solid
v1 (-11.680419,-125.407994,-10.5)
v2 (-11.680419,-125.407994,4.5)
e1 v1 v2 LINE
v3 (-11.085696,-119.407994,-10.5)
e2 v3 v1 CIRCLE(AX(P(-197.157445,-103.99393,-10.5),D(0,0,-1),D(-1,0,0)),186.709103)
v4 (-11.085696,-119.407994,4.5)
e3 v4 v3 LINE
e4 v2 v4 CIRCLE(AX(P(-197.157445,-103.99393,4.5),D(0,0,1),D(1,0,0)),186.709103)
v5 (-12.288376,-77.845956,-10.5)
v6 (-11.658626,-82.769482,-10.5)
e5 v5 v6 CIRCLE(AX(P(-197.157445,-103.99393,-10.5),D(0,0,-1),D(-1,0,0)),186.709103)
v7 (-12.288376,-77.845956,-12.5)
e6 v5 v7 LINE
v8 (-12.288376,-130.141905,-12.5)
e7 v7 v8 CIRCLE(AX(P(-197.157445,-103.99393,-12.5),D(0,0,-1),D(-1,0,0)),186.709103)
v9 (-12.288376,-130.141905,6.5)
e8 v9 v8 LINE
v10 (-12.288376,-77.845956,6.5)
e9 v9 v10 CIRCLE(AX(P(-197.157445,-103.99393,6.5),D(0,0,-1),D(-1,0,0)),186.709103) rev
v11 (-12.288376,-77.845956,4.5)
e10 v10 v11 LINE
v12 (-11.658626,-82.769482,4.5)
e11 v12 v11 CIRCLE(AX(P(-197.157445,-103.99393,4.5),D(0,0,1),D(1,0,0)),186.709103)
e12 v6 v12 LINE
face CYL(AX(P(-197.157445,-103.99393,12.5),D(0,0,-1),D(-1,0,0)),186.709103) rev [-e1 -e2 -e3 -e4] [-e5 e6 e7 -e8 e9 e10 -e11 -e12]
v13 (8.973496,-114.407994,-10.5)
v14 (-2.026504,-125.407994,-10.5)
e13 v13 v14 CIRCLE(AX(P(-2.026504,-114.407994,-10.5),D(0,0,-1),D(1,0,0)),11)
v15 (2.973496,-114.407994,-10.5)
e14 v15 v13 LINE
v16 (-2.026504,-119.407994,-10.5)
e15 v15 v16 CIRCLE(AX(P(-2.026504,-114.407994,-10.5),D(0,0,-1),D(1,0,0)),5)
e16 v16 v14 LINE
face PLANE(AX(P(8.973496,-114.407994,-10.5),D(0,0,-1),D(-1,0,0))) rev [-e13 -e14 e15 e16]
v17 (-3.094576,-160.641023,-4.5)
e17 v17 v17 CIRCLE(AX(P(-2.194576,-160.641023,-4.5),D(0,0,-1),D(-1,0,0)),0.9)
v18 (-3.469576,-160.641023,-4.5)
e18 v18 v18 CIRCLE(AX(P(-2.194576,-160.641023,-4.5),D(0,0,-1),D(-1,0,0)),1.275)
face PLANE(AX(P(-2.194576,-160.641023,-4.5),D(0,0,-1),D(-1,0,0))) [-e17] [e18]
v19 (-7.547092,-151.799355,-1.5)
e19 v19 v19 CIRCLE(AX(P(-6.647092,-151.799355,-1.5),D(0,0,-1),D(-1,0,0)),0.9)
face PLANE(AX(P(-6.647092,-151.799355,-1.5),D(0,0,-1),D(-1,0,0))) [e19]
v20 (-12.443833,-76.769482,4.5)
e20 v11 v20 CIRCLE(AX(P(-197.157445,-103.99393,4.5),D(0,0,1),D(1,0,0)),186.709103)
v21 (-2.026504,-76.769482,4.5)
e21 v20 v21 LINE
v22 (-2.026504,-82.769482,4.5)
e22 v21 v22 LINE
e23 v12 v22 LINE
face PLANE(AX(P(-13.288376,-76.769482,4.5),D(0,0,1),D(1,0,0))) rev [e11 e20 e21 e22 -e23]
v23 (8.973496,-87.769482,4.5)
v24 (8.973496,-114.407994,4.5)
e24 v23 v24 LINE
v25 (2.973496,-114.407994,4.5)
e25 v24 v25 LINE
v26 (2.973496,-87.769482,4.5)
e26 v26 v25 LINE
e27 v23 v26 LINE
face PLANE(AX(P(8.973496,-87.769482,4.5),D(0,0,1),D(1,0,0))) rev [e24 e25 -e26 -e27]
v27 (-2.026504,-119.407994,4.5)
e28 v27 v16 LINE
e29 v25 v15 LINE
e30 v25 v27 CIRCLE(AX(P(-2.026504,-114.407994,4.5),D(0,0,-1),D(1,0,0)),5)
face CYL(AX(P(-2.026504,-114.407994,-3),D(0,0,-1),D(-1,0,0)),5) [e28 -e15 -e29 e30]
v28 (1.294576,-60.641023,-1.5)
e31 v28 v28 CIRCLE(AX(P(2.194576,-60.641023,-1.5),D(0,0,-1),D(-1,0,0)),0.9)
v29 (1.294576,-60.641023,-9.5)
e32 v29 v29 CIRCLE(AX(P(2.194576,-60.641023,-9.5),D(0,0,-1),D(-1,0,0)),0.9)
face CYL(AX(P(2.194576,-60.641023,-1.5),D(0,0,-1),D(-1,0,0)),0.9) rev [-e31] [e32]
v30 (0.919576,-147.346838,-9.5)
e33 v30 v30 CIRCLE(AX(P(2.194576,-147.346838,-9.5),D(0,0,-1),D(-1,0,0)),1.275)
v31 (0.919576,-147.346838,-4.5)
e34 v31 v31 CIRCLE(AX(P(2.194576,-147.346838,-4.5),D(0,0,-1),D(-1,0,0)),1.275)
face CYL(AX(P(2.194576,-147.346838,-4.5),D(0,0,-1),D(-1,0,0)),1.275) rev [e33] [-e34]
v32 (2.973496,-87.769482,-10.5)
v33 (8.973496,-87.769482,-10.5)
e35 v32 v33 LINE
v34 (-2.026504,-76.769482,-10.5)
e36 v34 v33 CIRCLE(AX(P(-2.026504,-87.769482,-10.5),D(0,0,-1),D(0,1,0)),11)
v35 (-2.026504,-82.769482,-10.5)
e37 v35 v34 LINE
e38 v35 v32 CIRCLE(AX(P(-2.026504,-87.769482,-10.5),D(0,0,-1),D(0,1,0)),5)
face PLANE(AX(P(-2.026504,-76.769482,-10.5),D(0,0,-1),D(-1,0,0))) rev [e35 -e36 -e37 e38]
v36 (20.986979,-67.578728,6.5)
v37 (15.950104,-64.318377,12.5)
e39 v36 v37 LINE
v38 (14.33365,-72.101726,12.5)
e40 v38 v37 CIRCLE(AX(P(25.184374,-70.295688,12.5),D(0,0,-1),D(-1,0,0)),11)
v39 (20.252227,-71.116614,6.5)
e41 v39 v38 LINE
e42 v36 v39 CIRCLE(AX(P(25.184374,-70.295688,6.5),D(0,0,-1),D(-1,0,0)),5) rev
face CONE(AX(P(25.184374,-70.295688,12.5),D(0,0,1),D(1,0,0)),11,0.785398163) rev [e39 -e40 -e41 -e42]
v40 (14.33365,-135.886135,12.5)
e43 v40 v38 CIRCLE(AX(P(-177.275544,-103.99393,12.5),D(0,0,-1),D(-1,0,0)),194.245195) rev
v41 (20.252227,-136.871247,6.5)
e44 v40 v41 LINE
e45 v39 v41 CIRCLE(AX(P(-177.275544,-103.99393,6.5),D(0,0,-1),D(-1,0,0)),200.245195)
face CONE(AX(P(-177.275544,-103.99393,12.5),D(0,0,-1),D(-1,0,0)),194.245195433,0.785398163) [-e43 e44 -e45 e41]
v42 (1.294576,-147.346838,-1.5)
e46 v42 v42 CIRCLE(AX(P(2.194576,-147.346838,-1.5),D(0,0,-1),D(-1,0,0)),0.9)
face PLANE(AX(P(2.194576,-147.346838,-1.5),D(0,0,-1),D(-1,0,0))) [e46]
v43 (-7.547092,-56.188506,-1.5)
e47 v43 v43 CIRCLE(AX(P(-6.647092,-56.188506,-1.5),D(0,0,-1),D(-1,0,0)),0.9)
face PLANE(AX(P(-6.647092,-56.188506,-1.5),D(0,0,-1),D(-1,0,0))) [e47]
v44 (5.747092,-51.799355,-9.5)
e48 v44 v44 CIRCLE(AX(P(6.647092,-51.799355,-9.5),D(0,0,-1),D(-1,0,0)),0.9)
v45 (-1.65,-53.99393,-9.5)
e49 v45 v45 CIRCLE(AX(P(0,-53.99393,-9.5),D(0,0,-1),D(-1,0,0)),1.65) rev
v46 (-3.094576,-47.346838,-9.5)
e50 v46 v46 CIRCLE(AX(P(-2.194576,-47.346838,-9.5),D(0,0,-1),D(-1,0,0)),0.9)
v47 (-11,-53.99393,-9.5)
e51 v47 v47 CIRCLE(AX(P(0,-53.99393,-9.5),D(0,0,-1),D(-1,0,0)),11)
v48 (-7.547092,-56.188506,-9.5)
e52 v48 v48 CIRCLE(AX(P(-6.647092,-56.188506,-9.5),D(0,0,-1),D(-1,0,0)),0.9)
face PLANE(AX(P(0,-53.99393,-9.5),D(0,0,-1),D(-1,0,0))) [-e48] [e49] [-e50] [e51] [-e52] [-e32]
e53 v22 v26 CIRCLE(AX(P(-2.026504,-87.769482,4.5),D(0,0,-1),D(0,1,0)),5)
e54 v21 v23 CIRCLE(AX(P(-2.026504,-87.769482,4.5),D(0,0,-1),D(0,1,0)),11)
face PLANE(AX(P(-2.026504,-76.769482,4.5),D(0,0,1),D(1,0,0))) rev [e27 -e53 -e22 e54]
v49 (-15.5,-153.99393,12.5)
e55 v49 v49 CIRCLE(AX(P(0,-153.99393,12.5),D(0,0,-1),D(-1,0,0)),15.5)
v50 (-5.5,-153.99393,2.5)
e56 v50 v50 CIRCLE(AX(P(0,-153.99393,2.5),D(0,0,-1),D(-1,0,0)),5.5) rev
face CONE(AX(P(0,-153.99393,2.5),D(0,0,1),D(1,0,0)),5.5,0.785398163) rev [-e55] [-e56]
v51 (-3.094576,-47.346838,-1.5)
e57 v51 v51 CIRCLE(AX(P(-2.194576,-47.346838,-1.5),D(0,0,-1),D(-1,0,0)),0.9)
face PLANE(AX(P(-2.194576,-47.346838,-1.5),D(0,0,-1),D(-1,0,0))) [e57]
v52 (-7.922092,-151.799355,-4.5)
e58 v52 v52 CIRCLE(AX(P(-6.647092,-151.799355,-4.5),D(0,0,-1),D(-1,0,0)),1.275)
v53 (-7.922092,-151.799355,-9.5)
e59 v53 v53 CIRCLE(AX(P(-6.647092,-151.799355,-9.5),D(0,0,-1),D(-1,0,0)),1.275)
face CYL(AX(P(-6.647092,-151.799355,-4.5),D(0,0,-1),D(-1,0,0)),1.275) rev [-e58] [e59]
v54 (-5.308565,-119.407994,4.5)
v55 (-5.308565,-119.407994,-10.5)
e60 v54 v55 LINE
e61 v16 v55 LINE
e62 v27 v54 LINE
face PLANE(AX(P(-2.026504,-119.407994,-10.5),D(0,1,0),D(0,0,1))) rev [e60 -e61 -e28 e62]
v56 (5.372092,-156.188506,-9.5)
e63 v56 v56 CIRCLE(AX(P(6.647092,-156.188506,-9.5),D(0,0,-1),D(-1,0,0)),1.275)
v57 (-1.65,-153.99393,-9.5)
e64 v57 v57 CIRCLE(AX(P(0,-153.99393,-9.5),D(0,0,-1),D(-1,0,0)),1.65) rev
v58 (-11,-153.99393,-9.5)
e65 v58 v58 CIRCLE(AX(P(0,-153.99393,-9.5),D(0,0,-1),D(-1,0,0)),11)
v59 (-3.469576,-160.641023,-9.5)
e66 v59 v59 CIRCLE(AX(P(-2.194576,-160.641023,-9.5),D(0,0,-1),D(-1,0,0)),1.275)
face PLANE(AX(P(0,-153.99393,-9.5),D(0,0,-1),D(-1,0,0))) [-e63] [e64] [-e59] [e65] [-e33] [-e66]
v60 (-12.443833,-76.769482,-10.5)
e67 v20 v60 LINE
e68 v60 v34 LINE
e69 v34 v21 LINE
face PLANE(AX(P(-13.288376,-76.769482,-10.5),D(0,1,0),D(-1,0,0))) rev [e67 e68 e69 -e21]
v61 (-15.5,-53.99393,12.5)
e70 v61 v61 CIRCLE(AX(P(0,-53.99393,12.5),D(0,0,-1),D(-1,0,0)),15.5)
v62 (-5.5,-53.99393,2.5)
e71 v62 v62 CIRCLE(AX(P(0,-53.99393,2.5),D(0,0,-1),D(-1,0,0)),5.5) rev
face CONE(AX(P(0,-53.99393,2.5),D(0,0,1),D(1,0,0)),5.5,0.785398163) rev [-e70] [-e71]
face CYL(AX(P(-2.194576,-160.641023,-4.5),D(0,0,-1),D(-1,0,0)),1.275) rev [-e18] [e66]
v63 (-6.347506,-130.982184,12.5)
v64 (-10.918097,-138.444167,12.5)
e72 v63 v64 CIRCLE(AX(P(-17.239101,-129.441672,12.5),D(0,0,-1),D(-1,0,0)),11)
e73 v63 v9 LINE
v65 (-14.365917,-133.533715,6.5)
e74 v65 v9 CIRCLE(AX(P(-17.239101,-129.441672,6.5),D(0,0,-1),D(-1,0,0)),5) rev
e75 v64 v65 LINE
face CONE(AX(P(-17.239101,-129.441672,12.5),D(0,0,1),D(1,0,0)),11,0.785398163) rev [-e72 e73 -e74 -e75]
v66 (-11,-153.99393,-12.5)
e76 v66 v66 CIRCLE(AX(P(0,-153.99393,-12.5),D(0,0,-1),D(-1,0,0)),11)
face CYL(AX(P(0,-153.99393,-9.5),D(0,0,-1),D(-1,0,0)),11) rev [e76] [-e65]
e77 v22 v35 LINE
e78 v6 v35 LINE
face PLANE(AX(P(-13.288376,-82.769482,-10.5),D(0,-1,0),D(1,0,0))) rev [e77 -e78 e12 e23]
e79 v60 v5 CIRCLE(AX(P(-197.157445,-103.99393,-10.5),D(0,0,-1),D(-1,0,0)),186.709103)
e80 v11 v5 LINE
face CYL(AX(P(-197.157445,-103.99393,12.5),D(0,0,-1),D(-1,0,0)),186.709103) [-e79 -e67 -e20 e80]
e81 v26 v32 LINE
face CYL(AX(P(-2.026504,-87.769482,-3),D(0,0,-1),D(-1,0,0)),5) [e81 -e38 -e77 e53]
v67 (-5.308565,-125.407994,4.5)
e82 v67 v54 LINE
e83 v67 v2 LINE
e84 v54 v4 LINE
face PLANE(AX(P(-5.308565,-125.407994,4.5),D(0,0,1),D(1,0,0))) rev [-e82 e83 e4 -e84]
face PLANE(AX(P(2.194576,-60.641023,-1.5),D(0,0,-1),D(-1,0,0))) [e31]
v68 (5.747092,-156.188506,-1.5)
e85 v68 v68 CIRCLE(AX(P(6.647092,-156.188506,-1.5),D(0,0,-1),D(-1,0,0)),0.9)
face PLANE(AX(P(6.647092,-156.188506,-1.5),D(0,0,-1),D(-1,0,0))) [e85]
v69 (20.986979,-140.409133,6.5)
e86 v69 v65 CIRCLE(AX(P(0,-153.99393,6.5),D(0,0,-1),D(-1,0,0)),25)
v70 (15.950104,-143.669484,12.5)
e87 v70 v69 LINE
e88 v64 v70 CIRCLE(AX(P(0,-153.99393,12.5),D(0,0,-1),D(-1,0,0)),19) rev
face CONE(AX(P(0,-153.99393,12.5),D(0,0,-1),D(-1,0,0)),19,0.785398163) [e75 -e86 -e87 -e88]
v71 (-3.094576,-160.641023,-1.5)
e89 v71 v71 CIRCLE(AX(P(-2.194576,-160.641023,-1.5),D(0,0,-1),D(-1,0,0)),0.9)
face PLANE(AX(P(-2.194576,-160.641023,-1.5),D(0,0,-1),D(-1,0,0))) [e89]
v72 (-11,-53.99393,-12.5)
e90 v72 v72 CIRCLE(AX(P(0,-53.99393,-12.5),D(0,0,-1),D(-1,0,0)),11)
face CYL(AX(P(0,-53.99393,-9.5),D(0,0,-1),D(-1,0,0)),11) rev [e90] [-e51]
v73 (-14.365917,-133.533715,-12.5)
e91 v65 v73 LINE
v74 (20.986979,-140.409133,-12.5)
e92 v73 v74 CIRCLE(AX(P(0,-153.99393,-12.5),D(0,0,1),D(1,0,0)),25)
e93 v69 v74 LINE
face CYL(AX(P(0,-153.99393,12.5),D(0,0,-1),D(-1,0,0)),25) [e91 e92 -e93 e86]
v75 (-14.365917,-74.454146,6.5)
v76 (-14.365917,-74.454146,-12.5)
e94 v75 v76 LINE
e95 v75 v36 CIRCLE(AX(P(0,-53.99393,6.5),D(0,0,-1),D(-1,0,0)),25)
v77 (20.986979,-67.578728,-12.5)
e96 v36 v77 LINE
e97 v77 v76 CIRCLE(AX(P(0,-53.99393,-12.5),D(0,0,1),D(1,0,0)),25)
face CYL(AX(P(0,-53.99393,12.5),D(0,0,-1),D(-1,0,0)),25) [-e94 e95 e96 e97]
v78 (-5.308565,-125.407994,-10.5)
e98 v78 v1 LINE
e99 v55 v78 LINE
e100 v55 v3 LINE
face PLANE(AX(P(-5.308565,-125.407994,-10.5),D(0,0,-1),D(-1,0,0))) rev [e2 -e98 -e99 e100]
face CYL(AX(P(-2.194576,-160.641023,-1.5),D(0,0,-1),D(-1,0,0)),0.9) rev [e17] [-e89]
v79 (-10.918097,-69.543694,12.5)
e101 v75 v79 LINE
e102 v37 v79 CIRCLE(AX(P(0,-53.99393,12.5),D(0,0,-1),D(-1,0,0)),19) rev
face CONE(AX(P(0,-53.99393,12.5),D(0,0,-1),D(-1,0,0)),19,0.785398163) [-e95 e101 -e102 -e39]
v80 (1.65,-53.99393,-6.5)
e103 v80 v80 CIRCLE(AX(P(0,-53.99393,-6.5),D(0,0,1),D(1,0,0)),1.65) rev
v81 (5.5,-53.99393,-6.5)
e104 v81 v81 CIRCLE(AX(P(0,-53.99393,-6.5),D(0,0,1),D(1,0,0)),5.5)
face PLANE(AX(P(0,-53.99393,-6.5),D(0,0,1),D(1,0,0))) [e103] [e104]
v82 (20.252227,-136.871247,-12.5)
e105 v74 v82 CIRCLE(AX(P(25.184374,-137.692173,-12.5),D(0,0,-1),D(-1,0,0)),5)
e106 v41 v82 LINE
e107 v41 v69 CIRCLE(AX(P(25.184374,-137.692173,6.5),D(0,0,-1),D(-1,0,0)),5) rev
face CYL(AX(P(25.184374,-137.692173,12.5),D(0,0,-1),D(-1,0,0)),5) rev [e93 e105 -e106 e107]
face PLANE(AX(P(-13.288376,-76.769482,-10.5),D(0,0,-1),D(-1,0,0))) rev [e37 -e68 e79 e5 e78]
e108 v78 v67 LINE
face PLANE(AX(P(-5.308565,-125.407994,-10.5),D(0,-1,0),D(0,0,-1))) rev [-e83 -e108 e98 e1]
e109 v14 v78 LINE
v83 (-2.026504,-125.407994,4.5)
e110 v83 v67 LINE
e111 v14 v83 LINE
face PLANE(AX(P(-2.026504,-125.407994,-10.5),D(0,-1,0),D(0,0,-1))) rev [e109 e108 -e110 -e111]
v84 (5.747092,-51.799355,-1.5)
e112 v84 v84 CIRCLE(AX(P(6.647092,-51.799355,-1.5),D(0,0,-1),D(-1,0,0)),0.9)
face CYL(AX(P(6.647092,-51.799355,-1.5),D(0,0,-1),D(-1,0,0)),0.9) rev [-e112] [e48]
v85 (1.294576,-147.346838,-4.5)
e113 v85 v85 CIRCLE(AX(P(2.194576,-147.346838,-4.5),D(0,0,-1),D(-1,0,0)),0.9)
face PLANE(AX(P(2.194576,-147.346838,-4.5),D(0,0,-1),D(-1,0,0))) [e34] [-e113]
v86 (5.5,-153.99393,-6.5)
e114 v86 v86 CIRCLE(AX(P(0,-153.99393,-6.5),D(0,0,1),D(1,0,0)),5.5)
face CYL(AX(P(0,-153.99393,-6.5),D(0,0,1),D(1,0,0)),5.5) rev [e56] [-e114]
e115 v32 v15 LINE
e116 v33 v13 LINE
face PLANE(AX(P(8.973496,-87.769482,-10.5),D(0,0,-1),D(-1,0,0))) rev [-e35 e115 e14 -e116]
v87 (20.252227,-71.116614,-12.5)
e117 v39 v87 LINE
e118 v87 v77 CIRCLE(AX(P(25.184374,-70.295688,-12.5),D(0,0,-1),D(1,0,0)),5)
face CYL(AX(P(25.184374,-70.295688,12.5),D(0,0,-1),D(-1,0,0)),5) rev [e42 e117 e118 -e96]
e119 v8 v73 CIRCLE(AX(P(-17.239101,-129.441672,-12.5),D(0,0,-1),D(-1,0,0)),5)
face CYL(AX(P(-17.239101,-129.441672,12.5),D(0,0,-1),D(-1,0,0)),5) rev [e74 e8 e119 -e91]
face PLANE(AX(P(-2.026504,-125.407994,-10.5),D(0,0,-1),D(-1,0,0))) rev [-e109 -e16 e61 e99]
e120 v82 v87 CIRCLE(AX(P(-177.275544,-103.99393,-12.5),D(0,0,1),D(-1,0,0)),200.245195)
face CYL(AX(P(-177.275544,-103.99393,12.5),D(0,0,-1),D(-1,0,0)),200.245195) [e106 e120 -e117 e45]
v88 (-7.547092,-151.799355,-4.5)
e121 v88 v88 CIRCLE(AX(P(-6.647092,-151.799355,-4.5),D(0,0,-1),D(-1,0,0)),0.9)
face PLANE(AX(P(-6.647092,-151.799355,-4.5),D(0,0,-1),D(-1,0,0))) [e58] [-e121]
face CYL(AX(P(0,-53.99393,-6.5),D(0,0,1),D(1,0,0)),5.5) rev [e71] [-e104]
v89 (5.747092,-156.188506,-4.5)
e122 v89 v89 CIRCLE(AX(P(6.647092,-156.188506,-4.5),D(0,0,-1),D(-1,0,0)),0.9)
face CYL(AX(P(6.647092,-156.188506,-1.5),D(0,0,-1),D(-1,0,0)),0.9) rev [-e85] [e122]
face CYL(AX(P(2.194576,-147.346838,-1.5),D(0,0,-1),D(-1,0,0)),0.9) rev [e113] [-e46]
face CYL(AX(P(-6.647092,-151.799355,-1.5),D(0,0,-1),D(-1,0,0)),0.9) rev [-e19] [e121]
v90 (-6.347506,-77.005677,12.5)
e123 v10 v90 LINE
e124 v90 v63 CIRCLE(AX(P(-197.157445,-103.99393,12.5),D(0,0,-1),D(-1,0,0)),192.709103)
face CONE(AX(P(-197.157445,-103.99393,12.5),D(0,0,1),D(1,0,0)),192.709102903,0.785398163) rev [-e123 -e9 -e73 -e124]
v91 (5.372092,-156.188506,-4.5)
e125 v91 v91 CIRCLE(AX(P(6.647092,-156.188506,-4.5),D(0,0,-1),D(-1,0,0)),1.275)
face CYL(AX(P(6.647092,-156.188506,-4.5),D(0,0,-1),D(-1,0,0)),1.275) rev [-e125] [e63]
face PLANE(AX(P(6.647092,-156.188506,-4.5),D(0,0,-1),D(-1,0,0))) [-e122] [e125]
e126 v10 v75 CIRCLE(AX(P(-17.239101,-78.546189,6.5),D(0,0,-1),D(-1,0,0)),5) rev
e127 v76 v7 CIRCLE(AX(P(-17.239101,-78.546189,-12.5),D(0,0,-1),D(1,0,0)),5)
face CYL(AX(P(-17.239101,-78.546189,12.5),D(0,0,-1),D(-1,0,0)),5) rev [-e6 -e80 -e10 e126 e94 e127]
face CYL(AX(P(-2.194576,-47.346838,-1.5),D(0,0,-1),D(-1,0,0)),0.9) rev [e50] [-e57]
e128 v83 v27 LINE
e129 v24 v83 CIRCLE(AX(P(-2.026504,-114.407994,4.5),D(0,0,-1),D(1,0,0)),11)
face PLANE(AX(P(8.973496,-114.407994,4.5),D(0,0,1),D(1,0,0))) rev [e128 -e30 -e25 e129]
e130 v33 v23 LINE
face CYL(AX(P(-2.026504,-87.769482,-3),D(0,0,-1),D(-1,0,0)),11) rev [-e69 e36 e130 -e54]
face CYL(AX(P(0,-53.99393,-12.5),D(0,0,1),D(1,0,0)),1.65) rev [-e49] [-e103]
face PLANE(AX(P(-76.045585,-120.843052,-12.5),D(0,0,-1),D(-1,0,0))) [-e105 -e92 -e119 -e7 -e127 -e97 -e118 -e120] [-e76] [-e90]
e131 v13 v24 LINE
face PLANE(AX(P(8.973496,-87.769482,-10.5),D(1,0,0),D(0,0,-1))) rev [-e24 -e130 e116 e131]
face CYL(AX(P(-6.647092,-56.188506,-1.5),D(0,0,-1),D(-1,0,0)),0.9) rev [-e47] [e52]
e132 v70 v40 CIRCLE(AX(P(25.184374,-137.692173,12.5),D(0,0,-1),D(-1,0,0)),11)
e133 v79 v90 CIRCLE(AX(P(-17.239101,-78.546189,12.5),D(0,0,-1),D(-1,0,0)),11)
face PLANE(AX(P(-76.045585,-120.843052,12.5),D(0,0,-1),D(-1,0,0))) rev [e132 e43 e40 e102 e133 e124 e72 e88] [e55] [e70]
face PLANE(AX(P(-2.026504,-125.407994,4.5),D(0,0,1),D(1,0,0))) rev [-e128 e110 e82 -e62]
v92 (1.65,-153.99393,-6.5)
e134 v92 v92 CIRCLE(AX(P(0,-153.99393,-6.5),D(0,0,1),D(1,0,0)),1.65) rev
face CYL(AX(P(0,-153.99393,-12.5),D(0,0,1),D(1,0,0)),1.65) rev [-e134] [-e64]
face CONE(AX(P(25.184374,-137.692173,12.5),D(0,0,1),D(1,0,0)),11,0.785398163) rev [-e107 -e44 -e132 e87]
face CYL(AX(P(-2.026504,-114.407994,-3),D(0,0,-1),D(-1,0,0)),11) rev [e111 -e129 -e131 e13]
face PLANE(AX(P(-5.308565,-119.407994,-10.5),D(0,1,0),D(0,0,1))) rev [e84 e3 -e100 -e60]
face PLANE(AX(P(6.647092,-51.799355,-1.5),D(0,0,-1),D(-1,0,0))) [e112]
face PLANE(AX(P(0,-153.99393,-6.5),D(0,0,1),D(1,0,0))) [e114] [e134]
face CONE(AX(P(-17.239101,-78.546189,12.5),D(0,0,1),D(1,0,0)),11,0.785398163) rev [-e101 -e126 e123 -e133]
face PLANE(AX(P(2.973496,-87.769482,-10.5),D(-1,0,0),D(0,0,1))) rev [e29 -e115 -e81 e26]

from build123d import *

# Parameters (mm, degrees)
BOSS_EXTRUDE2_DEPTH = 12.5
SKETCH2_R           = 1.65
CUT_EXTRUDE1_DEPTH  = 183.452259897
SKETCH4_R           = 11
CUT_EXTRUDE3_DEPTH  = 3
CHAMFER1_SIZE       = 6
SKETCH32_R          = 1.275
CUT_EXTRUDE6_DEPTH  = 8
SKETCH34_R          = 0.9
CUT_EXTRUDE7_DEPTH  = 8
SKETCH44_R          = 5.5
CUT_EXTRUDE8_DEPTH  = 19
CHAMFER2_SIZE       = 10
CUT_SWEEP1_START    = -10.5
CUT_SWEEP1_DEPTH    = 15


# Read off the part's stored shape, not the designer's step: Cut-Sweep1
with BuildPart() as part:
    # Sketch1 → Boss-Extrude2 (new, symmetric)
    with BuildSketch(Plane.XY):
        with BuildLine():
            ThreePointArc((20.986978603, -67.578728182), (-4.772573404, -29.453707497), (-14.365917101, -74.454146144))
            ThreePointArc((-14.365917101, -74.454146144), (-12.975360601, -75.93457639), (-12.28837595, -77.845956305))
            ThreePointArc((-12.28837595, -77.845956305), (-10.448341727, -103.99393046), (-12.28837595, -130.141904615))
            ThreePointArc((-12.28837595, -130.141904615), (-12.975360601, -132.05328453), (-14.365917101, -133.533714776))
            ThreePointArc((-14.365917101, -133.533714776), (-4.772573404, -178.534153424), (20.986978603, -140.409132739))
            ThreePointArc((20.986978603, -140.409132739), (20.288835581, -138.708883787), (20.252226745, -136.871246725))
            ThreePointArc((20.252226745, -136.871246725), (22.969651044, -103.99393046), (20.252226745, -71.116614196))
            ThreePointArc((20.252226745, -71.116614196), (20.288835581, -69.278977134), (20.986978603, -67.578728182))
        make_face()
    extrude(amount=BOSS_EXTRUDE2_DEPTH, both=True)

    # Sketch2 → Cut-Extrude1 (cut, through all)
    with BuildSketch(Plane.XY.offset(12.5)):
        with Locations((0, -53.99393046)):
            Circle(SKETCH2_R)
        with Locations((0, -153.99393046)):
            Circle(SKETCH2_R)
    extrude(amount=-CUT_EXTRUDE1_DEPTH, mode=Mode.SUBTRACT)

    # Sketch4 → Cut-Extrude3 (cut)
    with BuildSketch(Plane(origin=(0, 0, -12.5), x_dir=(-1, 0, 0), z_dir=(0, 0, -1))):
        with Locations((0, -53.99393046)):
            Circle(SKETCH4_R)
        with Locations((0, -153.99393046)):
            Circle(SKETCH4_R)
    extrude(amount=-CUT_EXTRUDE3_DEPTH, mode=Mode.SUBTRACT)

    # Chamfer1
    chamfer1_edges = [part.edges().sort_by_distance(p)[0] for p in [
        (20.288835581, -69.278977134, 12.5),
        (-4.772573404, -29.453707497, 12.5),
        (-12.975360601, -75.93457639, 12.5),
        (-10.448341727, -103.99393046, 12.5),
        (-12.975360601, -132.05328453, 12.5),
        (-4.772573404, -178.534153424, 12.5),
        (20.288835581, -138.708883787, 12.5),
        (22.969651044, -103.99393046, 12.5),
    ]]
    chamfer(chamfer1_edges, length=CHAMFER1_SIZE)

    # Sketch32 → Cut-Extrude6 (cut)
    with BuildSketch(Plane(origin=(0, 0, -12.5), x_dir=(-1, 0, 0), z_dir=(0, 0, -1))):
        with Locations((-2.194575755, -147.346838069)):
            Circle(SKETCH32_R)
        with Locations((6.647092391, -151.799354705)):
            Circle(SKETCH32_R)
        with Locations((-6.647092391, -156.188506215)):
            Circle(SKETCH32_R)
        with Locations((2.194575755, -160.641022851)):
            Circle(SKETCH32_R)
    extrude(amount=-CUT_EXTRUDE6_DEPTH, mode=Mode.SUBTRACT)

    # Sketch34 → Cut-Extrude7 (cut)
    with BuildSketch(Plane(origin=(0, 0, -9.5), x_dir=(-1, 0, 0), z_dir=(0, 0, -1))):
        with Locations((-6.647092391, -51.799354705)):
            Circle(SKETCH34_R)
        with Locations((2.194575755, -47.346838069)):
            Circle(SKETCH34_R)
        with Locations((6.647092391, -56.188506215)):
            Circle(SKETCH34_R)
        with Locations((-2.194575755, -60.641022851)):
            Circle(SKETCH34_R)
        with Locations((-2.194575755, -147.346838069)):
            Circle(SKETCH34_R)
        with Locations((-6.647092391, -156.188506215)):
            Circle(SKETCH34_R)
        with Locations((2.194575755, -160.641022851)):
            Circle(SKETCH34_R)
        with Locations((6.647092391, -151.799354705)):
            Circle(SKETCH34_R)
    extrude(amount=-CUT_EXTRUDE7_DEPTH, mode=Mode.SUBTRACT)

    # Sketch44 → Cut-Extrude8 (cut)
    with BuildSketch(Plane.XY.offset(12.5)):
        with Locations((0, -53.99393046)):
            Circle(SKETCH44_R)
        with Locations((0, -153.99393046)):
            Circle(SKETCH44_R)
    extrude(amount=-CUT_EXTRUDE8_DEPTH, mode=Mode.SUBTRACT)

    # Chamfer2
    chamfer2_edges = [part.edges().sort_by_distance(p)[0] for p in [
        (-5.5, -53.99393046, 12.5),
        (-5.5, -153.99393046, 12.5),
    ]]
    chamfer(chamfer2_edges, length=CHAMFER2_SIZE)

    # Cut-Sweep1 outline → Cut-Sweep1 (cut)
    with BuildSketch(Plane.XY.offset(CUT_SWEEP1_START)):
        with BuildLine():
            Line((-2.026503985, -76.769481595), (-12.443832541, -76.769481595))
            ThreePointArc((-12.443832541, -76.769481595), (-12.365320392, -77.307605752), (-12.28837595, -77.845956305))
            ThreePointArc((-12.28837595, -77.845956305), (-11.957138623, -80.305626129), (-11.658625557, -82.769481595))
            Line((-11.658625557, -82.769481595), (-2.026503985, -82.769481595))
            ThreePointArc((-2.026503985, -82.769481595), (1.509029921, -84.233947689), (2.973496015, -87.769481595))
            Line((2.973496015, -87.769481595), (2.973496015, -114.4079942))
            ThreePointArc((2.973496015, -114.4079942), (1.509029921, -117.943528106), (-2.026503985, -119.4079942))
            Line((-2.026503985, -119.4079942), (-11.085695711, -119.4079942))
            ThreePointArc((-11.085695711, -119.4079942), (-11.358836079, -122.410395034), (-11.680419149, -125.4079942))
            Line((-11.680419149, -125.4079942), (-2.026503985, -125.4079942))
            ThreePointArc((-2.026503985, -125.4079942), (5.751670608, -122.186168793), (8.973496015, -114.4079942))
            Line((8.973496015, -114.4079942), (8.973496015, -87.769481595))
            ThreePointArc((8.973496015, -87.769481595), (5.751670608, -79.991307002), (-2.026503985, -76.769481595))
        make_face()
    extrude(amount=CUT_SWEEP1_DEPTH, mode=Mode.SUBTRACT)


solid = part.part
